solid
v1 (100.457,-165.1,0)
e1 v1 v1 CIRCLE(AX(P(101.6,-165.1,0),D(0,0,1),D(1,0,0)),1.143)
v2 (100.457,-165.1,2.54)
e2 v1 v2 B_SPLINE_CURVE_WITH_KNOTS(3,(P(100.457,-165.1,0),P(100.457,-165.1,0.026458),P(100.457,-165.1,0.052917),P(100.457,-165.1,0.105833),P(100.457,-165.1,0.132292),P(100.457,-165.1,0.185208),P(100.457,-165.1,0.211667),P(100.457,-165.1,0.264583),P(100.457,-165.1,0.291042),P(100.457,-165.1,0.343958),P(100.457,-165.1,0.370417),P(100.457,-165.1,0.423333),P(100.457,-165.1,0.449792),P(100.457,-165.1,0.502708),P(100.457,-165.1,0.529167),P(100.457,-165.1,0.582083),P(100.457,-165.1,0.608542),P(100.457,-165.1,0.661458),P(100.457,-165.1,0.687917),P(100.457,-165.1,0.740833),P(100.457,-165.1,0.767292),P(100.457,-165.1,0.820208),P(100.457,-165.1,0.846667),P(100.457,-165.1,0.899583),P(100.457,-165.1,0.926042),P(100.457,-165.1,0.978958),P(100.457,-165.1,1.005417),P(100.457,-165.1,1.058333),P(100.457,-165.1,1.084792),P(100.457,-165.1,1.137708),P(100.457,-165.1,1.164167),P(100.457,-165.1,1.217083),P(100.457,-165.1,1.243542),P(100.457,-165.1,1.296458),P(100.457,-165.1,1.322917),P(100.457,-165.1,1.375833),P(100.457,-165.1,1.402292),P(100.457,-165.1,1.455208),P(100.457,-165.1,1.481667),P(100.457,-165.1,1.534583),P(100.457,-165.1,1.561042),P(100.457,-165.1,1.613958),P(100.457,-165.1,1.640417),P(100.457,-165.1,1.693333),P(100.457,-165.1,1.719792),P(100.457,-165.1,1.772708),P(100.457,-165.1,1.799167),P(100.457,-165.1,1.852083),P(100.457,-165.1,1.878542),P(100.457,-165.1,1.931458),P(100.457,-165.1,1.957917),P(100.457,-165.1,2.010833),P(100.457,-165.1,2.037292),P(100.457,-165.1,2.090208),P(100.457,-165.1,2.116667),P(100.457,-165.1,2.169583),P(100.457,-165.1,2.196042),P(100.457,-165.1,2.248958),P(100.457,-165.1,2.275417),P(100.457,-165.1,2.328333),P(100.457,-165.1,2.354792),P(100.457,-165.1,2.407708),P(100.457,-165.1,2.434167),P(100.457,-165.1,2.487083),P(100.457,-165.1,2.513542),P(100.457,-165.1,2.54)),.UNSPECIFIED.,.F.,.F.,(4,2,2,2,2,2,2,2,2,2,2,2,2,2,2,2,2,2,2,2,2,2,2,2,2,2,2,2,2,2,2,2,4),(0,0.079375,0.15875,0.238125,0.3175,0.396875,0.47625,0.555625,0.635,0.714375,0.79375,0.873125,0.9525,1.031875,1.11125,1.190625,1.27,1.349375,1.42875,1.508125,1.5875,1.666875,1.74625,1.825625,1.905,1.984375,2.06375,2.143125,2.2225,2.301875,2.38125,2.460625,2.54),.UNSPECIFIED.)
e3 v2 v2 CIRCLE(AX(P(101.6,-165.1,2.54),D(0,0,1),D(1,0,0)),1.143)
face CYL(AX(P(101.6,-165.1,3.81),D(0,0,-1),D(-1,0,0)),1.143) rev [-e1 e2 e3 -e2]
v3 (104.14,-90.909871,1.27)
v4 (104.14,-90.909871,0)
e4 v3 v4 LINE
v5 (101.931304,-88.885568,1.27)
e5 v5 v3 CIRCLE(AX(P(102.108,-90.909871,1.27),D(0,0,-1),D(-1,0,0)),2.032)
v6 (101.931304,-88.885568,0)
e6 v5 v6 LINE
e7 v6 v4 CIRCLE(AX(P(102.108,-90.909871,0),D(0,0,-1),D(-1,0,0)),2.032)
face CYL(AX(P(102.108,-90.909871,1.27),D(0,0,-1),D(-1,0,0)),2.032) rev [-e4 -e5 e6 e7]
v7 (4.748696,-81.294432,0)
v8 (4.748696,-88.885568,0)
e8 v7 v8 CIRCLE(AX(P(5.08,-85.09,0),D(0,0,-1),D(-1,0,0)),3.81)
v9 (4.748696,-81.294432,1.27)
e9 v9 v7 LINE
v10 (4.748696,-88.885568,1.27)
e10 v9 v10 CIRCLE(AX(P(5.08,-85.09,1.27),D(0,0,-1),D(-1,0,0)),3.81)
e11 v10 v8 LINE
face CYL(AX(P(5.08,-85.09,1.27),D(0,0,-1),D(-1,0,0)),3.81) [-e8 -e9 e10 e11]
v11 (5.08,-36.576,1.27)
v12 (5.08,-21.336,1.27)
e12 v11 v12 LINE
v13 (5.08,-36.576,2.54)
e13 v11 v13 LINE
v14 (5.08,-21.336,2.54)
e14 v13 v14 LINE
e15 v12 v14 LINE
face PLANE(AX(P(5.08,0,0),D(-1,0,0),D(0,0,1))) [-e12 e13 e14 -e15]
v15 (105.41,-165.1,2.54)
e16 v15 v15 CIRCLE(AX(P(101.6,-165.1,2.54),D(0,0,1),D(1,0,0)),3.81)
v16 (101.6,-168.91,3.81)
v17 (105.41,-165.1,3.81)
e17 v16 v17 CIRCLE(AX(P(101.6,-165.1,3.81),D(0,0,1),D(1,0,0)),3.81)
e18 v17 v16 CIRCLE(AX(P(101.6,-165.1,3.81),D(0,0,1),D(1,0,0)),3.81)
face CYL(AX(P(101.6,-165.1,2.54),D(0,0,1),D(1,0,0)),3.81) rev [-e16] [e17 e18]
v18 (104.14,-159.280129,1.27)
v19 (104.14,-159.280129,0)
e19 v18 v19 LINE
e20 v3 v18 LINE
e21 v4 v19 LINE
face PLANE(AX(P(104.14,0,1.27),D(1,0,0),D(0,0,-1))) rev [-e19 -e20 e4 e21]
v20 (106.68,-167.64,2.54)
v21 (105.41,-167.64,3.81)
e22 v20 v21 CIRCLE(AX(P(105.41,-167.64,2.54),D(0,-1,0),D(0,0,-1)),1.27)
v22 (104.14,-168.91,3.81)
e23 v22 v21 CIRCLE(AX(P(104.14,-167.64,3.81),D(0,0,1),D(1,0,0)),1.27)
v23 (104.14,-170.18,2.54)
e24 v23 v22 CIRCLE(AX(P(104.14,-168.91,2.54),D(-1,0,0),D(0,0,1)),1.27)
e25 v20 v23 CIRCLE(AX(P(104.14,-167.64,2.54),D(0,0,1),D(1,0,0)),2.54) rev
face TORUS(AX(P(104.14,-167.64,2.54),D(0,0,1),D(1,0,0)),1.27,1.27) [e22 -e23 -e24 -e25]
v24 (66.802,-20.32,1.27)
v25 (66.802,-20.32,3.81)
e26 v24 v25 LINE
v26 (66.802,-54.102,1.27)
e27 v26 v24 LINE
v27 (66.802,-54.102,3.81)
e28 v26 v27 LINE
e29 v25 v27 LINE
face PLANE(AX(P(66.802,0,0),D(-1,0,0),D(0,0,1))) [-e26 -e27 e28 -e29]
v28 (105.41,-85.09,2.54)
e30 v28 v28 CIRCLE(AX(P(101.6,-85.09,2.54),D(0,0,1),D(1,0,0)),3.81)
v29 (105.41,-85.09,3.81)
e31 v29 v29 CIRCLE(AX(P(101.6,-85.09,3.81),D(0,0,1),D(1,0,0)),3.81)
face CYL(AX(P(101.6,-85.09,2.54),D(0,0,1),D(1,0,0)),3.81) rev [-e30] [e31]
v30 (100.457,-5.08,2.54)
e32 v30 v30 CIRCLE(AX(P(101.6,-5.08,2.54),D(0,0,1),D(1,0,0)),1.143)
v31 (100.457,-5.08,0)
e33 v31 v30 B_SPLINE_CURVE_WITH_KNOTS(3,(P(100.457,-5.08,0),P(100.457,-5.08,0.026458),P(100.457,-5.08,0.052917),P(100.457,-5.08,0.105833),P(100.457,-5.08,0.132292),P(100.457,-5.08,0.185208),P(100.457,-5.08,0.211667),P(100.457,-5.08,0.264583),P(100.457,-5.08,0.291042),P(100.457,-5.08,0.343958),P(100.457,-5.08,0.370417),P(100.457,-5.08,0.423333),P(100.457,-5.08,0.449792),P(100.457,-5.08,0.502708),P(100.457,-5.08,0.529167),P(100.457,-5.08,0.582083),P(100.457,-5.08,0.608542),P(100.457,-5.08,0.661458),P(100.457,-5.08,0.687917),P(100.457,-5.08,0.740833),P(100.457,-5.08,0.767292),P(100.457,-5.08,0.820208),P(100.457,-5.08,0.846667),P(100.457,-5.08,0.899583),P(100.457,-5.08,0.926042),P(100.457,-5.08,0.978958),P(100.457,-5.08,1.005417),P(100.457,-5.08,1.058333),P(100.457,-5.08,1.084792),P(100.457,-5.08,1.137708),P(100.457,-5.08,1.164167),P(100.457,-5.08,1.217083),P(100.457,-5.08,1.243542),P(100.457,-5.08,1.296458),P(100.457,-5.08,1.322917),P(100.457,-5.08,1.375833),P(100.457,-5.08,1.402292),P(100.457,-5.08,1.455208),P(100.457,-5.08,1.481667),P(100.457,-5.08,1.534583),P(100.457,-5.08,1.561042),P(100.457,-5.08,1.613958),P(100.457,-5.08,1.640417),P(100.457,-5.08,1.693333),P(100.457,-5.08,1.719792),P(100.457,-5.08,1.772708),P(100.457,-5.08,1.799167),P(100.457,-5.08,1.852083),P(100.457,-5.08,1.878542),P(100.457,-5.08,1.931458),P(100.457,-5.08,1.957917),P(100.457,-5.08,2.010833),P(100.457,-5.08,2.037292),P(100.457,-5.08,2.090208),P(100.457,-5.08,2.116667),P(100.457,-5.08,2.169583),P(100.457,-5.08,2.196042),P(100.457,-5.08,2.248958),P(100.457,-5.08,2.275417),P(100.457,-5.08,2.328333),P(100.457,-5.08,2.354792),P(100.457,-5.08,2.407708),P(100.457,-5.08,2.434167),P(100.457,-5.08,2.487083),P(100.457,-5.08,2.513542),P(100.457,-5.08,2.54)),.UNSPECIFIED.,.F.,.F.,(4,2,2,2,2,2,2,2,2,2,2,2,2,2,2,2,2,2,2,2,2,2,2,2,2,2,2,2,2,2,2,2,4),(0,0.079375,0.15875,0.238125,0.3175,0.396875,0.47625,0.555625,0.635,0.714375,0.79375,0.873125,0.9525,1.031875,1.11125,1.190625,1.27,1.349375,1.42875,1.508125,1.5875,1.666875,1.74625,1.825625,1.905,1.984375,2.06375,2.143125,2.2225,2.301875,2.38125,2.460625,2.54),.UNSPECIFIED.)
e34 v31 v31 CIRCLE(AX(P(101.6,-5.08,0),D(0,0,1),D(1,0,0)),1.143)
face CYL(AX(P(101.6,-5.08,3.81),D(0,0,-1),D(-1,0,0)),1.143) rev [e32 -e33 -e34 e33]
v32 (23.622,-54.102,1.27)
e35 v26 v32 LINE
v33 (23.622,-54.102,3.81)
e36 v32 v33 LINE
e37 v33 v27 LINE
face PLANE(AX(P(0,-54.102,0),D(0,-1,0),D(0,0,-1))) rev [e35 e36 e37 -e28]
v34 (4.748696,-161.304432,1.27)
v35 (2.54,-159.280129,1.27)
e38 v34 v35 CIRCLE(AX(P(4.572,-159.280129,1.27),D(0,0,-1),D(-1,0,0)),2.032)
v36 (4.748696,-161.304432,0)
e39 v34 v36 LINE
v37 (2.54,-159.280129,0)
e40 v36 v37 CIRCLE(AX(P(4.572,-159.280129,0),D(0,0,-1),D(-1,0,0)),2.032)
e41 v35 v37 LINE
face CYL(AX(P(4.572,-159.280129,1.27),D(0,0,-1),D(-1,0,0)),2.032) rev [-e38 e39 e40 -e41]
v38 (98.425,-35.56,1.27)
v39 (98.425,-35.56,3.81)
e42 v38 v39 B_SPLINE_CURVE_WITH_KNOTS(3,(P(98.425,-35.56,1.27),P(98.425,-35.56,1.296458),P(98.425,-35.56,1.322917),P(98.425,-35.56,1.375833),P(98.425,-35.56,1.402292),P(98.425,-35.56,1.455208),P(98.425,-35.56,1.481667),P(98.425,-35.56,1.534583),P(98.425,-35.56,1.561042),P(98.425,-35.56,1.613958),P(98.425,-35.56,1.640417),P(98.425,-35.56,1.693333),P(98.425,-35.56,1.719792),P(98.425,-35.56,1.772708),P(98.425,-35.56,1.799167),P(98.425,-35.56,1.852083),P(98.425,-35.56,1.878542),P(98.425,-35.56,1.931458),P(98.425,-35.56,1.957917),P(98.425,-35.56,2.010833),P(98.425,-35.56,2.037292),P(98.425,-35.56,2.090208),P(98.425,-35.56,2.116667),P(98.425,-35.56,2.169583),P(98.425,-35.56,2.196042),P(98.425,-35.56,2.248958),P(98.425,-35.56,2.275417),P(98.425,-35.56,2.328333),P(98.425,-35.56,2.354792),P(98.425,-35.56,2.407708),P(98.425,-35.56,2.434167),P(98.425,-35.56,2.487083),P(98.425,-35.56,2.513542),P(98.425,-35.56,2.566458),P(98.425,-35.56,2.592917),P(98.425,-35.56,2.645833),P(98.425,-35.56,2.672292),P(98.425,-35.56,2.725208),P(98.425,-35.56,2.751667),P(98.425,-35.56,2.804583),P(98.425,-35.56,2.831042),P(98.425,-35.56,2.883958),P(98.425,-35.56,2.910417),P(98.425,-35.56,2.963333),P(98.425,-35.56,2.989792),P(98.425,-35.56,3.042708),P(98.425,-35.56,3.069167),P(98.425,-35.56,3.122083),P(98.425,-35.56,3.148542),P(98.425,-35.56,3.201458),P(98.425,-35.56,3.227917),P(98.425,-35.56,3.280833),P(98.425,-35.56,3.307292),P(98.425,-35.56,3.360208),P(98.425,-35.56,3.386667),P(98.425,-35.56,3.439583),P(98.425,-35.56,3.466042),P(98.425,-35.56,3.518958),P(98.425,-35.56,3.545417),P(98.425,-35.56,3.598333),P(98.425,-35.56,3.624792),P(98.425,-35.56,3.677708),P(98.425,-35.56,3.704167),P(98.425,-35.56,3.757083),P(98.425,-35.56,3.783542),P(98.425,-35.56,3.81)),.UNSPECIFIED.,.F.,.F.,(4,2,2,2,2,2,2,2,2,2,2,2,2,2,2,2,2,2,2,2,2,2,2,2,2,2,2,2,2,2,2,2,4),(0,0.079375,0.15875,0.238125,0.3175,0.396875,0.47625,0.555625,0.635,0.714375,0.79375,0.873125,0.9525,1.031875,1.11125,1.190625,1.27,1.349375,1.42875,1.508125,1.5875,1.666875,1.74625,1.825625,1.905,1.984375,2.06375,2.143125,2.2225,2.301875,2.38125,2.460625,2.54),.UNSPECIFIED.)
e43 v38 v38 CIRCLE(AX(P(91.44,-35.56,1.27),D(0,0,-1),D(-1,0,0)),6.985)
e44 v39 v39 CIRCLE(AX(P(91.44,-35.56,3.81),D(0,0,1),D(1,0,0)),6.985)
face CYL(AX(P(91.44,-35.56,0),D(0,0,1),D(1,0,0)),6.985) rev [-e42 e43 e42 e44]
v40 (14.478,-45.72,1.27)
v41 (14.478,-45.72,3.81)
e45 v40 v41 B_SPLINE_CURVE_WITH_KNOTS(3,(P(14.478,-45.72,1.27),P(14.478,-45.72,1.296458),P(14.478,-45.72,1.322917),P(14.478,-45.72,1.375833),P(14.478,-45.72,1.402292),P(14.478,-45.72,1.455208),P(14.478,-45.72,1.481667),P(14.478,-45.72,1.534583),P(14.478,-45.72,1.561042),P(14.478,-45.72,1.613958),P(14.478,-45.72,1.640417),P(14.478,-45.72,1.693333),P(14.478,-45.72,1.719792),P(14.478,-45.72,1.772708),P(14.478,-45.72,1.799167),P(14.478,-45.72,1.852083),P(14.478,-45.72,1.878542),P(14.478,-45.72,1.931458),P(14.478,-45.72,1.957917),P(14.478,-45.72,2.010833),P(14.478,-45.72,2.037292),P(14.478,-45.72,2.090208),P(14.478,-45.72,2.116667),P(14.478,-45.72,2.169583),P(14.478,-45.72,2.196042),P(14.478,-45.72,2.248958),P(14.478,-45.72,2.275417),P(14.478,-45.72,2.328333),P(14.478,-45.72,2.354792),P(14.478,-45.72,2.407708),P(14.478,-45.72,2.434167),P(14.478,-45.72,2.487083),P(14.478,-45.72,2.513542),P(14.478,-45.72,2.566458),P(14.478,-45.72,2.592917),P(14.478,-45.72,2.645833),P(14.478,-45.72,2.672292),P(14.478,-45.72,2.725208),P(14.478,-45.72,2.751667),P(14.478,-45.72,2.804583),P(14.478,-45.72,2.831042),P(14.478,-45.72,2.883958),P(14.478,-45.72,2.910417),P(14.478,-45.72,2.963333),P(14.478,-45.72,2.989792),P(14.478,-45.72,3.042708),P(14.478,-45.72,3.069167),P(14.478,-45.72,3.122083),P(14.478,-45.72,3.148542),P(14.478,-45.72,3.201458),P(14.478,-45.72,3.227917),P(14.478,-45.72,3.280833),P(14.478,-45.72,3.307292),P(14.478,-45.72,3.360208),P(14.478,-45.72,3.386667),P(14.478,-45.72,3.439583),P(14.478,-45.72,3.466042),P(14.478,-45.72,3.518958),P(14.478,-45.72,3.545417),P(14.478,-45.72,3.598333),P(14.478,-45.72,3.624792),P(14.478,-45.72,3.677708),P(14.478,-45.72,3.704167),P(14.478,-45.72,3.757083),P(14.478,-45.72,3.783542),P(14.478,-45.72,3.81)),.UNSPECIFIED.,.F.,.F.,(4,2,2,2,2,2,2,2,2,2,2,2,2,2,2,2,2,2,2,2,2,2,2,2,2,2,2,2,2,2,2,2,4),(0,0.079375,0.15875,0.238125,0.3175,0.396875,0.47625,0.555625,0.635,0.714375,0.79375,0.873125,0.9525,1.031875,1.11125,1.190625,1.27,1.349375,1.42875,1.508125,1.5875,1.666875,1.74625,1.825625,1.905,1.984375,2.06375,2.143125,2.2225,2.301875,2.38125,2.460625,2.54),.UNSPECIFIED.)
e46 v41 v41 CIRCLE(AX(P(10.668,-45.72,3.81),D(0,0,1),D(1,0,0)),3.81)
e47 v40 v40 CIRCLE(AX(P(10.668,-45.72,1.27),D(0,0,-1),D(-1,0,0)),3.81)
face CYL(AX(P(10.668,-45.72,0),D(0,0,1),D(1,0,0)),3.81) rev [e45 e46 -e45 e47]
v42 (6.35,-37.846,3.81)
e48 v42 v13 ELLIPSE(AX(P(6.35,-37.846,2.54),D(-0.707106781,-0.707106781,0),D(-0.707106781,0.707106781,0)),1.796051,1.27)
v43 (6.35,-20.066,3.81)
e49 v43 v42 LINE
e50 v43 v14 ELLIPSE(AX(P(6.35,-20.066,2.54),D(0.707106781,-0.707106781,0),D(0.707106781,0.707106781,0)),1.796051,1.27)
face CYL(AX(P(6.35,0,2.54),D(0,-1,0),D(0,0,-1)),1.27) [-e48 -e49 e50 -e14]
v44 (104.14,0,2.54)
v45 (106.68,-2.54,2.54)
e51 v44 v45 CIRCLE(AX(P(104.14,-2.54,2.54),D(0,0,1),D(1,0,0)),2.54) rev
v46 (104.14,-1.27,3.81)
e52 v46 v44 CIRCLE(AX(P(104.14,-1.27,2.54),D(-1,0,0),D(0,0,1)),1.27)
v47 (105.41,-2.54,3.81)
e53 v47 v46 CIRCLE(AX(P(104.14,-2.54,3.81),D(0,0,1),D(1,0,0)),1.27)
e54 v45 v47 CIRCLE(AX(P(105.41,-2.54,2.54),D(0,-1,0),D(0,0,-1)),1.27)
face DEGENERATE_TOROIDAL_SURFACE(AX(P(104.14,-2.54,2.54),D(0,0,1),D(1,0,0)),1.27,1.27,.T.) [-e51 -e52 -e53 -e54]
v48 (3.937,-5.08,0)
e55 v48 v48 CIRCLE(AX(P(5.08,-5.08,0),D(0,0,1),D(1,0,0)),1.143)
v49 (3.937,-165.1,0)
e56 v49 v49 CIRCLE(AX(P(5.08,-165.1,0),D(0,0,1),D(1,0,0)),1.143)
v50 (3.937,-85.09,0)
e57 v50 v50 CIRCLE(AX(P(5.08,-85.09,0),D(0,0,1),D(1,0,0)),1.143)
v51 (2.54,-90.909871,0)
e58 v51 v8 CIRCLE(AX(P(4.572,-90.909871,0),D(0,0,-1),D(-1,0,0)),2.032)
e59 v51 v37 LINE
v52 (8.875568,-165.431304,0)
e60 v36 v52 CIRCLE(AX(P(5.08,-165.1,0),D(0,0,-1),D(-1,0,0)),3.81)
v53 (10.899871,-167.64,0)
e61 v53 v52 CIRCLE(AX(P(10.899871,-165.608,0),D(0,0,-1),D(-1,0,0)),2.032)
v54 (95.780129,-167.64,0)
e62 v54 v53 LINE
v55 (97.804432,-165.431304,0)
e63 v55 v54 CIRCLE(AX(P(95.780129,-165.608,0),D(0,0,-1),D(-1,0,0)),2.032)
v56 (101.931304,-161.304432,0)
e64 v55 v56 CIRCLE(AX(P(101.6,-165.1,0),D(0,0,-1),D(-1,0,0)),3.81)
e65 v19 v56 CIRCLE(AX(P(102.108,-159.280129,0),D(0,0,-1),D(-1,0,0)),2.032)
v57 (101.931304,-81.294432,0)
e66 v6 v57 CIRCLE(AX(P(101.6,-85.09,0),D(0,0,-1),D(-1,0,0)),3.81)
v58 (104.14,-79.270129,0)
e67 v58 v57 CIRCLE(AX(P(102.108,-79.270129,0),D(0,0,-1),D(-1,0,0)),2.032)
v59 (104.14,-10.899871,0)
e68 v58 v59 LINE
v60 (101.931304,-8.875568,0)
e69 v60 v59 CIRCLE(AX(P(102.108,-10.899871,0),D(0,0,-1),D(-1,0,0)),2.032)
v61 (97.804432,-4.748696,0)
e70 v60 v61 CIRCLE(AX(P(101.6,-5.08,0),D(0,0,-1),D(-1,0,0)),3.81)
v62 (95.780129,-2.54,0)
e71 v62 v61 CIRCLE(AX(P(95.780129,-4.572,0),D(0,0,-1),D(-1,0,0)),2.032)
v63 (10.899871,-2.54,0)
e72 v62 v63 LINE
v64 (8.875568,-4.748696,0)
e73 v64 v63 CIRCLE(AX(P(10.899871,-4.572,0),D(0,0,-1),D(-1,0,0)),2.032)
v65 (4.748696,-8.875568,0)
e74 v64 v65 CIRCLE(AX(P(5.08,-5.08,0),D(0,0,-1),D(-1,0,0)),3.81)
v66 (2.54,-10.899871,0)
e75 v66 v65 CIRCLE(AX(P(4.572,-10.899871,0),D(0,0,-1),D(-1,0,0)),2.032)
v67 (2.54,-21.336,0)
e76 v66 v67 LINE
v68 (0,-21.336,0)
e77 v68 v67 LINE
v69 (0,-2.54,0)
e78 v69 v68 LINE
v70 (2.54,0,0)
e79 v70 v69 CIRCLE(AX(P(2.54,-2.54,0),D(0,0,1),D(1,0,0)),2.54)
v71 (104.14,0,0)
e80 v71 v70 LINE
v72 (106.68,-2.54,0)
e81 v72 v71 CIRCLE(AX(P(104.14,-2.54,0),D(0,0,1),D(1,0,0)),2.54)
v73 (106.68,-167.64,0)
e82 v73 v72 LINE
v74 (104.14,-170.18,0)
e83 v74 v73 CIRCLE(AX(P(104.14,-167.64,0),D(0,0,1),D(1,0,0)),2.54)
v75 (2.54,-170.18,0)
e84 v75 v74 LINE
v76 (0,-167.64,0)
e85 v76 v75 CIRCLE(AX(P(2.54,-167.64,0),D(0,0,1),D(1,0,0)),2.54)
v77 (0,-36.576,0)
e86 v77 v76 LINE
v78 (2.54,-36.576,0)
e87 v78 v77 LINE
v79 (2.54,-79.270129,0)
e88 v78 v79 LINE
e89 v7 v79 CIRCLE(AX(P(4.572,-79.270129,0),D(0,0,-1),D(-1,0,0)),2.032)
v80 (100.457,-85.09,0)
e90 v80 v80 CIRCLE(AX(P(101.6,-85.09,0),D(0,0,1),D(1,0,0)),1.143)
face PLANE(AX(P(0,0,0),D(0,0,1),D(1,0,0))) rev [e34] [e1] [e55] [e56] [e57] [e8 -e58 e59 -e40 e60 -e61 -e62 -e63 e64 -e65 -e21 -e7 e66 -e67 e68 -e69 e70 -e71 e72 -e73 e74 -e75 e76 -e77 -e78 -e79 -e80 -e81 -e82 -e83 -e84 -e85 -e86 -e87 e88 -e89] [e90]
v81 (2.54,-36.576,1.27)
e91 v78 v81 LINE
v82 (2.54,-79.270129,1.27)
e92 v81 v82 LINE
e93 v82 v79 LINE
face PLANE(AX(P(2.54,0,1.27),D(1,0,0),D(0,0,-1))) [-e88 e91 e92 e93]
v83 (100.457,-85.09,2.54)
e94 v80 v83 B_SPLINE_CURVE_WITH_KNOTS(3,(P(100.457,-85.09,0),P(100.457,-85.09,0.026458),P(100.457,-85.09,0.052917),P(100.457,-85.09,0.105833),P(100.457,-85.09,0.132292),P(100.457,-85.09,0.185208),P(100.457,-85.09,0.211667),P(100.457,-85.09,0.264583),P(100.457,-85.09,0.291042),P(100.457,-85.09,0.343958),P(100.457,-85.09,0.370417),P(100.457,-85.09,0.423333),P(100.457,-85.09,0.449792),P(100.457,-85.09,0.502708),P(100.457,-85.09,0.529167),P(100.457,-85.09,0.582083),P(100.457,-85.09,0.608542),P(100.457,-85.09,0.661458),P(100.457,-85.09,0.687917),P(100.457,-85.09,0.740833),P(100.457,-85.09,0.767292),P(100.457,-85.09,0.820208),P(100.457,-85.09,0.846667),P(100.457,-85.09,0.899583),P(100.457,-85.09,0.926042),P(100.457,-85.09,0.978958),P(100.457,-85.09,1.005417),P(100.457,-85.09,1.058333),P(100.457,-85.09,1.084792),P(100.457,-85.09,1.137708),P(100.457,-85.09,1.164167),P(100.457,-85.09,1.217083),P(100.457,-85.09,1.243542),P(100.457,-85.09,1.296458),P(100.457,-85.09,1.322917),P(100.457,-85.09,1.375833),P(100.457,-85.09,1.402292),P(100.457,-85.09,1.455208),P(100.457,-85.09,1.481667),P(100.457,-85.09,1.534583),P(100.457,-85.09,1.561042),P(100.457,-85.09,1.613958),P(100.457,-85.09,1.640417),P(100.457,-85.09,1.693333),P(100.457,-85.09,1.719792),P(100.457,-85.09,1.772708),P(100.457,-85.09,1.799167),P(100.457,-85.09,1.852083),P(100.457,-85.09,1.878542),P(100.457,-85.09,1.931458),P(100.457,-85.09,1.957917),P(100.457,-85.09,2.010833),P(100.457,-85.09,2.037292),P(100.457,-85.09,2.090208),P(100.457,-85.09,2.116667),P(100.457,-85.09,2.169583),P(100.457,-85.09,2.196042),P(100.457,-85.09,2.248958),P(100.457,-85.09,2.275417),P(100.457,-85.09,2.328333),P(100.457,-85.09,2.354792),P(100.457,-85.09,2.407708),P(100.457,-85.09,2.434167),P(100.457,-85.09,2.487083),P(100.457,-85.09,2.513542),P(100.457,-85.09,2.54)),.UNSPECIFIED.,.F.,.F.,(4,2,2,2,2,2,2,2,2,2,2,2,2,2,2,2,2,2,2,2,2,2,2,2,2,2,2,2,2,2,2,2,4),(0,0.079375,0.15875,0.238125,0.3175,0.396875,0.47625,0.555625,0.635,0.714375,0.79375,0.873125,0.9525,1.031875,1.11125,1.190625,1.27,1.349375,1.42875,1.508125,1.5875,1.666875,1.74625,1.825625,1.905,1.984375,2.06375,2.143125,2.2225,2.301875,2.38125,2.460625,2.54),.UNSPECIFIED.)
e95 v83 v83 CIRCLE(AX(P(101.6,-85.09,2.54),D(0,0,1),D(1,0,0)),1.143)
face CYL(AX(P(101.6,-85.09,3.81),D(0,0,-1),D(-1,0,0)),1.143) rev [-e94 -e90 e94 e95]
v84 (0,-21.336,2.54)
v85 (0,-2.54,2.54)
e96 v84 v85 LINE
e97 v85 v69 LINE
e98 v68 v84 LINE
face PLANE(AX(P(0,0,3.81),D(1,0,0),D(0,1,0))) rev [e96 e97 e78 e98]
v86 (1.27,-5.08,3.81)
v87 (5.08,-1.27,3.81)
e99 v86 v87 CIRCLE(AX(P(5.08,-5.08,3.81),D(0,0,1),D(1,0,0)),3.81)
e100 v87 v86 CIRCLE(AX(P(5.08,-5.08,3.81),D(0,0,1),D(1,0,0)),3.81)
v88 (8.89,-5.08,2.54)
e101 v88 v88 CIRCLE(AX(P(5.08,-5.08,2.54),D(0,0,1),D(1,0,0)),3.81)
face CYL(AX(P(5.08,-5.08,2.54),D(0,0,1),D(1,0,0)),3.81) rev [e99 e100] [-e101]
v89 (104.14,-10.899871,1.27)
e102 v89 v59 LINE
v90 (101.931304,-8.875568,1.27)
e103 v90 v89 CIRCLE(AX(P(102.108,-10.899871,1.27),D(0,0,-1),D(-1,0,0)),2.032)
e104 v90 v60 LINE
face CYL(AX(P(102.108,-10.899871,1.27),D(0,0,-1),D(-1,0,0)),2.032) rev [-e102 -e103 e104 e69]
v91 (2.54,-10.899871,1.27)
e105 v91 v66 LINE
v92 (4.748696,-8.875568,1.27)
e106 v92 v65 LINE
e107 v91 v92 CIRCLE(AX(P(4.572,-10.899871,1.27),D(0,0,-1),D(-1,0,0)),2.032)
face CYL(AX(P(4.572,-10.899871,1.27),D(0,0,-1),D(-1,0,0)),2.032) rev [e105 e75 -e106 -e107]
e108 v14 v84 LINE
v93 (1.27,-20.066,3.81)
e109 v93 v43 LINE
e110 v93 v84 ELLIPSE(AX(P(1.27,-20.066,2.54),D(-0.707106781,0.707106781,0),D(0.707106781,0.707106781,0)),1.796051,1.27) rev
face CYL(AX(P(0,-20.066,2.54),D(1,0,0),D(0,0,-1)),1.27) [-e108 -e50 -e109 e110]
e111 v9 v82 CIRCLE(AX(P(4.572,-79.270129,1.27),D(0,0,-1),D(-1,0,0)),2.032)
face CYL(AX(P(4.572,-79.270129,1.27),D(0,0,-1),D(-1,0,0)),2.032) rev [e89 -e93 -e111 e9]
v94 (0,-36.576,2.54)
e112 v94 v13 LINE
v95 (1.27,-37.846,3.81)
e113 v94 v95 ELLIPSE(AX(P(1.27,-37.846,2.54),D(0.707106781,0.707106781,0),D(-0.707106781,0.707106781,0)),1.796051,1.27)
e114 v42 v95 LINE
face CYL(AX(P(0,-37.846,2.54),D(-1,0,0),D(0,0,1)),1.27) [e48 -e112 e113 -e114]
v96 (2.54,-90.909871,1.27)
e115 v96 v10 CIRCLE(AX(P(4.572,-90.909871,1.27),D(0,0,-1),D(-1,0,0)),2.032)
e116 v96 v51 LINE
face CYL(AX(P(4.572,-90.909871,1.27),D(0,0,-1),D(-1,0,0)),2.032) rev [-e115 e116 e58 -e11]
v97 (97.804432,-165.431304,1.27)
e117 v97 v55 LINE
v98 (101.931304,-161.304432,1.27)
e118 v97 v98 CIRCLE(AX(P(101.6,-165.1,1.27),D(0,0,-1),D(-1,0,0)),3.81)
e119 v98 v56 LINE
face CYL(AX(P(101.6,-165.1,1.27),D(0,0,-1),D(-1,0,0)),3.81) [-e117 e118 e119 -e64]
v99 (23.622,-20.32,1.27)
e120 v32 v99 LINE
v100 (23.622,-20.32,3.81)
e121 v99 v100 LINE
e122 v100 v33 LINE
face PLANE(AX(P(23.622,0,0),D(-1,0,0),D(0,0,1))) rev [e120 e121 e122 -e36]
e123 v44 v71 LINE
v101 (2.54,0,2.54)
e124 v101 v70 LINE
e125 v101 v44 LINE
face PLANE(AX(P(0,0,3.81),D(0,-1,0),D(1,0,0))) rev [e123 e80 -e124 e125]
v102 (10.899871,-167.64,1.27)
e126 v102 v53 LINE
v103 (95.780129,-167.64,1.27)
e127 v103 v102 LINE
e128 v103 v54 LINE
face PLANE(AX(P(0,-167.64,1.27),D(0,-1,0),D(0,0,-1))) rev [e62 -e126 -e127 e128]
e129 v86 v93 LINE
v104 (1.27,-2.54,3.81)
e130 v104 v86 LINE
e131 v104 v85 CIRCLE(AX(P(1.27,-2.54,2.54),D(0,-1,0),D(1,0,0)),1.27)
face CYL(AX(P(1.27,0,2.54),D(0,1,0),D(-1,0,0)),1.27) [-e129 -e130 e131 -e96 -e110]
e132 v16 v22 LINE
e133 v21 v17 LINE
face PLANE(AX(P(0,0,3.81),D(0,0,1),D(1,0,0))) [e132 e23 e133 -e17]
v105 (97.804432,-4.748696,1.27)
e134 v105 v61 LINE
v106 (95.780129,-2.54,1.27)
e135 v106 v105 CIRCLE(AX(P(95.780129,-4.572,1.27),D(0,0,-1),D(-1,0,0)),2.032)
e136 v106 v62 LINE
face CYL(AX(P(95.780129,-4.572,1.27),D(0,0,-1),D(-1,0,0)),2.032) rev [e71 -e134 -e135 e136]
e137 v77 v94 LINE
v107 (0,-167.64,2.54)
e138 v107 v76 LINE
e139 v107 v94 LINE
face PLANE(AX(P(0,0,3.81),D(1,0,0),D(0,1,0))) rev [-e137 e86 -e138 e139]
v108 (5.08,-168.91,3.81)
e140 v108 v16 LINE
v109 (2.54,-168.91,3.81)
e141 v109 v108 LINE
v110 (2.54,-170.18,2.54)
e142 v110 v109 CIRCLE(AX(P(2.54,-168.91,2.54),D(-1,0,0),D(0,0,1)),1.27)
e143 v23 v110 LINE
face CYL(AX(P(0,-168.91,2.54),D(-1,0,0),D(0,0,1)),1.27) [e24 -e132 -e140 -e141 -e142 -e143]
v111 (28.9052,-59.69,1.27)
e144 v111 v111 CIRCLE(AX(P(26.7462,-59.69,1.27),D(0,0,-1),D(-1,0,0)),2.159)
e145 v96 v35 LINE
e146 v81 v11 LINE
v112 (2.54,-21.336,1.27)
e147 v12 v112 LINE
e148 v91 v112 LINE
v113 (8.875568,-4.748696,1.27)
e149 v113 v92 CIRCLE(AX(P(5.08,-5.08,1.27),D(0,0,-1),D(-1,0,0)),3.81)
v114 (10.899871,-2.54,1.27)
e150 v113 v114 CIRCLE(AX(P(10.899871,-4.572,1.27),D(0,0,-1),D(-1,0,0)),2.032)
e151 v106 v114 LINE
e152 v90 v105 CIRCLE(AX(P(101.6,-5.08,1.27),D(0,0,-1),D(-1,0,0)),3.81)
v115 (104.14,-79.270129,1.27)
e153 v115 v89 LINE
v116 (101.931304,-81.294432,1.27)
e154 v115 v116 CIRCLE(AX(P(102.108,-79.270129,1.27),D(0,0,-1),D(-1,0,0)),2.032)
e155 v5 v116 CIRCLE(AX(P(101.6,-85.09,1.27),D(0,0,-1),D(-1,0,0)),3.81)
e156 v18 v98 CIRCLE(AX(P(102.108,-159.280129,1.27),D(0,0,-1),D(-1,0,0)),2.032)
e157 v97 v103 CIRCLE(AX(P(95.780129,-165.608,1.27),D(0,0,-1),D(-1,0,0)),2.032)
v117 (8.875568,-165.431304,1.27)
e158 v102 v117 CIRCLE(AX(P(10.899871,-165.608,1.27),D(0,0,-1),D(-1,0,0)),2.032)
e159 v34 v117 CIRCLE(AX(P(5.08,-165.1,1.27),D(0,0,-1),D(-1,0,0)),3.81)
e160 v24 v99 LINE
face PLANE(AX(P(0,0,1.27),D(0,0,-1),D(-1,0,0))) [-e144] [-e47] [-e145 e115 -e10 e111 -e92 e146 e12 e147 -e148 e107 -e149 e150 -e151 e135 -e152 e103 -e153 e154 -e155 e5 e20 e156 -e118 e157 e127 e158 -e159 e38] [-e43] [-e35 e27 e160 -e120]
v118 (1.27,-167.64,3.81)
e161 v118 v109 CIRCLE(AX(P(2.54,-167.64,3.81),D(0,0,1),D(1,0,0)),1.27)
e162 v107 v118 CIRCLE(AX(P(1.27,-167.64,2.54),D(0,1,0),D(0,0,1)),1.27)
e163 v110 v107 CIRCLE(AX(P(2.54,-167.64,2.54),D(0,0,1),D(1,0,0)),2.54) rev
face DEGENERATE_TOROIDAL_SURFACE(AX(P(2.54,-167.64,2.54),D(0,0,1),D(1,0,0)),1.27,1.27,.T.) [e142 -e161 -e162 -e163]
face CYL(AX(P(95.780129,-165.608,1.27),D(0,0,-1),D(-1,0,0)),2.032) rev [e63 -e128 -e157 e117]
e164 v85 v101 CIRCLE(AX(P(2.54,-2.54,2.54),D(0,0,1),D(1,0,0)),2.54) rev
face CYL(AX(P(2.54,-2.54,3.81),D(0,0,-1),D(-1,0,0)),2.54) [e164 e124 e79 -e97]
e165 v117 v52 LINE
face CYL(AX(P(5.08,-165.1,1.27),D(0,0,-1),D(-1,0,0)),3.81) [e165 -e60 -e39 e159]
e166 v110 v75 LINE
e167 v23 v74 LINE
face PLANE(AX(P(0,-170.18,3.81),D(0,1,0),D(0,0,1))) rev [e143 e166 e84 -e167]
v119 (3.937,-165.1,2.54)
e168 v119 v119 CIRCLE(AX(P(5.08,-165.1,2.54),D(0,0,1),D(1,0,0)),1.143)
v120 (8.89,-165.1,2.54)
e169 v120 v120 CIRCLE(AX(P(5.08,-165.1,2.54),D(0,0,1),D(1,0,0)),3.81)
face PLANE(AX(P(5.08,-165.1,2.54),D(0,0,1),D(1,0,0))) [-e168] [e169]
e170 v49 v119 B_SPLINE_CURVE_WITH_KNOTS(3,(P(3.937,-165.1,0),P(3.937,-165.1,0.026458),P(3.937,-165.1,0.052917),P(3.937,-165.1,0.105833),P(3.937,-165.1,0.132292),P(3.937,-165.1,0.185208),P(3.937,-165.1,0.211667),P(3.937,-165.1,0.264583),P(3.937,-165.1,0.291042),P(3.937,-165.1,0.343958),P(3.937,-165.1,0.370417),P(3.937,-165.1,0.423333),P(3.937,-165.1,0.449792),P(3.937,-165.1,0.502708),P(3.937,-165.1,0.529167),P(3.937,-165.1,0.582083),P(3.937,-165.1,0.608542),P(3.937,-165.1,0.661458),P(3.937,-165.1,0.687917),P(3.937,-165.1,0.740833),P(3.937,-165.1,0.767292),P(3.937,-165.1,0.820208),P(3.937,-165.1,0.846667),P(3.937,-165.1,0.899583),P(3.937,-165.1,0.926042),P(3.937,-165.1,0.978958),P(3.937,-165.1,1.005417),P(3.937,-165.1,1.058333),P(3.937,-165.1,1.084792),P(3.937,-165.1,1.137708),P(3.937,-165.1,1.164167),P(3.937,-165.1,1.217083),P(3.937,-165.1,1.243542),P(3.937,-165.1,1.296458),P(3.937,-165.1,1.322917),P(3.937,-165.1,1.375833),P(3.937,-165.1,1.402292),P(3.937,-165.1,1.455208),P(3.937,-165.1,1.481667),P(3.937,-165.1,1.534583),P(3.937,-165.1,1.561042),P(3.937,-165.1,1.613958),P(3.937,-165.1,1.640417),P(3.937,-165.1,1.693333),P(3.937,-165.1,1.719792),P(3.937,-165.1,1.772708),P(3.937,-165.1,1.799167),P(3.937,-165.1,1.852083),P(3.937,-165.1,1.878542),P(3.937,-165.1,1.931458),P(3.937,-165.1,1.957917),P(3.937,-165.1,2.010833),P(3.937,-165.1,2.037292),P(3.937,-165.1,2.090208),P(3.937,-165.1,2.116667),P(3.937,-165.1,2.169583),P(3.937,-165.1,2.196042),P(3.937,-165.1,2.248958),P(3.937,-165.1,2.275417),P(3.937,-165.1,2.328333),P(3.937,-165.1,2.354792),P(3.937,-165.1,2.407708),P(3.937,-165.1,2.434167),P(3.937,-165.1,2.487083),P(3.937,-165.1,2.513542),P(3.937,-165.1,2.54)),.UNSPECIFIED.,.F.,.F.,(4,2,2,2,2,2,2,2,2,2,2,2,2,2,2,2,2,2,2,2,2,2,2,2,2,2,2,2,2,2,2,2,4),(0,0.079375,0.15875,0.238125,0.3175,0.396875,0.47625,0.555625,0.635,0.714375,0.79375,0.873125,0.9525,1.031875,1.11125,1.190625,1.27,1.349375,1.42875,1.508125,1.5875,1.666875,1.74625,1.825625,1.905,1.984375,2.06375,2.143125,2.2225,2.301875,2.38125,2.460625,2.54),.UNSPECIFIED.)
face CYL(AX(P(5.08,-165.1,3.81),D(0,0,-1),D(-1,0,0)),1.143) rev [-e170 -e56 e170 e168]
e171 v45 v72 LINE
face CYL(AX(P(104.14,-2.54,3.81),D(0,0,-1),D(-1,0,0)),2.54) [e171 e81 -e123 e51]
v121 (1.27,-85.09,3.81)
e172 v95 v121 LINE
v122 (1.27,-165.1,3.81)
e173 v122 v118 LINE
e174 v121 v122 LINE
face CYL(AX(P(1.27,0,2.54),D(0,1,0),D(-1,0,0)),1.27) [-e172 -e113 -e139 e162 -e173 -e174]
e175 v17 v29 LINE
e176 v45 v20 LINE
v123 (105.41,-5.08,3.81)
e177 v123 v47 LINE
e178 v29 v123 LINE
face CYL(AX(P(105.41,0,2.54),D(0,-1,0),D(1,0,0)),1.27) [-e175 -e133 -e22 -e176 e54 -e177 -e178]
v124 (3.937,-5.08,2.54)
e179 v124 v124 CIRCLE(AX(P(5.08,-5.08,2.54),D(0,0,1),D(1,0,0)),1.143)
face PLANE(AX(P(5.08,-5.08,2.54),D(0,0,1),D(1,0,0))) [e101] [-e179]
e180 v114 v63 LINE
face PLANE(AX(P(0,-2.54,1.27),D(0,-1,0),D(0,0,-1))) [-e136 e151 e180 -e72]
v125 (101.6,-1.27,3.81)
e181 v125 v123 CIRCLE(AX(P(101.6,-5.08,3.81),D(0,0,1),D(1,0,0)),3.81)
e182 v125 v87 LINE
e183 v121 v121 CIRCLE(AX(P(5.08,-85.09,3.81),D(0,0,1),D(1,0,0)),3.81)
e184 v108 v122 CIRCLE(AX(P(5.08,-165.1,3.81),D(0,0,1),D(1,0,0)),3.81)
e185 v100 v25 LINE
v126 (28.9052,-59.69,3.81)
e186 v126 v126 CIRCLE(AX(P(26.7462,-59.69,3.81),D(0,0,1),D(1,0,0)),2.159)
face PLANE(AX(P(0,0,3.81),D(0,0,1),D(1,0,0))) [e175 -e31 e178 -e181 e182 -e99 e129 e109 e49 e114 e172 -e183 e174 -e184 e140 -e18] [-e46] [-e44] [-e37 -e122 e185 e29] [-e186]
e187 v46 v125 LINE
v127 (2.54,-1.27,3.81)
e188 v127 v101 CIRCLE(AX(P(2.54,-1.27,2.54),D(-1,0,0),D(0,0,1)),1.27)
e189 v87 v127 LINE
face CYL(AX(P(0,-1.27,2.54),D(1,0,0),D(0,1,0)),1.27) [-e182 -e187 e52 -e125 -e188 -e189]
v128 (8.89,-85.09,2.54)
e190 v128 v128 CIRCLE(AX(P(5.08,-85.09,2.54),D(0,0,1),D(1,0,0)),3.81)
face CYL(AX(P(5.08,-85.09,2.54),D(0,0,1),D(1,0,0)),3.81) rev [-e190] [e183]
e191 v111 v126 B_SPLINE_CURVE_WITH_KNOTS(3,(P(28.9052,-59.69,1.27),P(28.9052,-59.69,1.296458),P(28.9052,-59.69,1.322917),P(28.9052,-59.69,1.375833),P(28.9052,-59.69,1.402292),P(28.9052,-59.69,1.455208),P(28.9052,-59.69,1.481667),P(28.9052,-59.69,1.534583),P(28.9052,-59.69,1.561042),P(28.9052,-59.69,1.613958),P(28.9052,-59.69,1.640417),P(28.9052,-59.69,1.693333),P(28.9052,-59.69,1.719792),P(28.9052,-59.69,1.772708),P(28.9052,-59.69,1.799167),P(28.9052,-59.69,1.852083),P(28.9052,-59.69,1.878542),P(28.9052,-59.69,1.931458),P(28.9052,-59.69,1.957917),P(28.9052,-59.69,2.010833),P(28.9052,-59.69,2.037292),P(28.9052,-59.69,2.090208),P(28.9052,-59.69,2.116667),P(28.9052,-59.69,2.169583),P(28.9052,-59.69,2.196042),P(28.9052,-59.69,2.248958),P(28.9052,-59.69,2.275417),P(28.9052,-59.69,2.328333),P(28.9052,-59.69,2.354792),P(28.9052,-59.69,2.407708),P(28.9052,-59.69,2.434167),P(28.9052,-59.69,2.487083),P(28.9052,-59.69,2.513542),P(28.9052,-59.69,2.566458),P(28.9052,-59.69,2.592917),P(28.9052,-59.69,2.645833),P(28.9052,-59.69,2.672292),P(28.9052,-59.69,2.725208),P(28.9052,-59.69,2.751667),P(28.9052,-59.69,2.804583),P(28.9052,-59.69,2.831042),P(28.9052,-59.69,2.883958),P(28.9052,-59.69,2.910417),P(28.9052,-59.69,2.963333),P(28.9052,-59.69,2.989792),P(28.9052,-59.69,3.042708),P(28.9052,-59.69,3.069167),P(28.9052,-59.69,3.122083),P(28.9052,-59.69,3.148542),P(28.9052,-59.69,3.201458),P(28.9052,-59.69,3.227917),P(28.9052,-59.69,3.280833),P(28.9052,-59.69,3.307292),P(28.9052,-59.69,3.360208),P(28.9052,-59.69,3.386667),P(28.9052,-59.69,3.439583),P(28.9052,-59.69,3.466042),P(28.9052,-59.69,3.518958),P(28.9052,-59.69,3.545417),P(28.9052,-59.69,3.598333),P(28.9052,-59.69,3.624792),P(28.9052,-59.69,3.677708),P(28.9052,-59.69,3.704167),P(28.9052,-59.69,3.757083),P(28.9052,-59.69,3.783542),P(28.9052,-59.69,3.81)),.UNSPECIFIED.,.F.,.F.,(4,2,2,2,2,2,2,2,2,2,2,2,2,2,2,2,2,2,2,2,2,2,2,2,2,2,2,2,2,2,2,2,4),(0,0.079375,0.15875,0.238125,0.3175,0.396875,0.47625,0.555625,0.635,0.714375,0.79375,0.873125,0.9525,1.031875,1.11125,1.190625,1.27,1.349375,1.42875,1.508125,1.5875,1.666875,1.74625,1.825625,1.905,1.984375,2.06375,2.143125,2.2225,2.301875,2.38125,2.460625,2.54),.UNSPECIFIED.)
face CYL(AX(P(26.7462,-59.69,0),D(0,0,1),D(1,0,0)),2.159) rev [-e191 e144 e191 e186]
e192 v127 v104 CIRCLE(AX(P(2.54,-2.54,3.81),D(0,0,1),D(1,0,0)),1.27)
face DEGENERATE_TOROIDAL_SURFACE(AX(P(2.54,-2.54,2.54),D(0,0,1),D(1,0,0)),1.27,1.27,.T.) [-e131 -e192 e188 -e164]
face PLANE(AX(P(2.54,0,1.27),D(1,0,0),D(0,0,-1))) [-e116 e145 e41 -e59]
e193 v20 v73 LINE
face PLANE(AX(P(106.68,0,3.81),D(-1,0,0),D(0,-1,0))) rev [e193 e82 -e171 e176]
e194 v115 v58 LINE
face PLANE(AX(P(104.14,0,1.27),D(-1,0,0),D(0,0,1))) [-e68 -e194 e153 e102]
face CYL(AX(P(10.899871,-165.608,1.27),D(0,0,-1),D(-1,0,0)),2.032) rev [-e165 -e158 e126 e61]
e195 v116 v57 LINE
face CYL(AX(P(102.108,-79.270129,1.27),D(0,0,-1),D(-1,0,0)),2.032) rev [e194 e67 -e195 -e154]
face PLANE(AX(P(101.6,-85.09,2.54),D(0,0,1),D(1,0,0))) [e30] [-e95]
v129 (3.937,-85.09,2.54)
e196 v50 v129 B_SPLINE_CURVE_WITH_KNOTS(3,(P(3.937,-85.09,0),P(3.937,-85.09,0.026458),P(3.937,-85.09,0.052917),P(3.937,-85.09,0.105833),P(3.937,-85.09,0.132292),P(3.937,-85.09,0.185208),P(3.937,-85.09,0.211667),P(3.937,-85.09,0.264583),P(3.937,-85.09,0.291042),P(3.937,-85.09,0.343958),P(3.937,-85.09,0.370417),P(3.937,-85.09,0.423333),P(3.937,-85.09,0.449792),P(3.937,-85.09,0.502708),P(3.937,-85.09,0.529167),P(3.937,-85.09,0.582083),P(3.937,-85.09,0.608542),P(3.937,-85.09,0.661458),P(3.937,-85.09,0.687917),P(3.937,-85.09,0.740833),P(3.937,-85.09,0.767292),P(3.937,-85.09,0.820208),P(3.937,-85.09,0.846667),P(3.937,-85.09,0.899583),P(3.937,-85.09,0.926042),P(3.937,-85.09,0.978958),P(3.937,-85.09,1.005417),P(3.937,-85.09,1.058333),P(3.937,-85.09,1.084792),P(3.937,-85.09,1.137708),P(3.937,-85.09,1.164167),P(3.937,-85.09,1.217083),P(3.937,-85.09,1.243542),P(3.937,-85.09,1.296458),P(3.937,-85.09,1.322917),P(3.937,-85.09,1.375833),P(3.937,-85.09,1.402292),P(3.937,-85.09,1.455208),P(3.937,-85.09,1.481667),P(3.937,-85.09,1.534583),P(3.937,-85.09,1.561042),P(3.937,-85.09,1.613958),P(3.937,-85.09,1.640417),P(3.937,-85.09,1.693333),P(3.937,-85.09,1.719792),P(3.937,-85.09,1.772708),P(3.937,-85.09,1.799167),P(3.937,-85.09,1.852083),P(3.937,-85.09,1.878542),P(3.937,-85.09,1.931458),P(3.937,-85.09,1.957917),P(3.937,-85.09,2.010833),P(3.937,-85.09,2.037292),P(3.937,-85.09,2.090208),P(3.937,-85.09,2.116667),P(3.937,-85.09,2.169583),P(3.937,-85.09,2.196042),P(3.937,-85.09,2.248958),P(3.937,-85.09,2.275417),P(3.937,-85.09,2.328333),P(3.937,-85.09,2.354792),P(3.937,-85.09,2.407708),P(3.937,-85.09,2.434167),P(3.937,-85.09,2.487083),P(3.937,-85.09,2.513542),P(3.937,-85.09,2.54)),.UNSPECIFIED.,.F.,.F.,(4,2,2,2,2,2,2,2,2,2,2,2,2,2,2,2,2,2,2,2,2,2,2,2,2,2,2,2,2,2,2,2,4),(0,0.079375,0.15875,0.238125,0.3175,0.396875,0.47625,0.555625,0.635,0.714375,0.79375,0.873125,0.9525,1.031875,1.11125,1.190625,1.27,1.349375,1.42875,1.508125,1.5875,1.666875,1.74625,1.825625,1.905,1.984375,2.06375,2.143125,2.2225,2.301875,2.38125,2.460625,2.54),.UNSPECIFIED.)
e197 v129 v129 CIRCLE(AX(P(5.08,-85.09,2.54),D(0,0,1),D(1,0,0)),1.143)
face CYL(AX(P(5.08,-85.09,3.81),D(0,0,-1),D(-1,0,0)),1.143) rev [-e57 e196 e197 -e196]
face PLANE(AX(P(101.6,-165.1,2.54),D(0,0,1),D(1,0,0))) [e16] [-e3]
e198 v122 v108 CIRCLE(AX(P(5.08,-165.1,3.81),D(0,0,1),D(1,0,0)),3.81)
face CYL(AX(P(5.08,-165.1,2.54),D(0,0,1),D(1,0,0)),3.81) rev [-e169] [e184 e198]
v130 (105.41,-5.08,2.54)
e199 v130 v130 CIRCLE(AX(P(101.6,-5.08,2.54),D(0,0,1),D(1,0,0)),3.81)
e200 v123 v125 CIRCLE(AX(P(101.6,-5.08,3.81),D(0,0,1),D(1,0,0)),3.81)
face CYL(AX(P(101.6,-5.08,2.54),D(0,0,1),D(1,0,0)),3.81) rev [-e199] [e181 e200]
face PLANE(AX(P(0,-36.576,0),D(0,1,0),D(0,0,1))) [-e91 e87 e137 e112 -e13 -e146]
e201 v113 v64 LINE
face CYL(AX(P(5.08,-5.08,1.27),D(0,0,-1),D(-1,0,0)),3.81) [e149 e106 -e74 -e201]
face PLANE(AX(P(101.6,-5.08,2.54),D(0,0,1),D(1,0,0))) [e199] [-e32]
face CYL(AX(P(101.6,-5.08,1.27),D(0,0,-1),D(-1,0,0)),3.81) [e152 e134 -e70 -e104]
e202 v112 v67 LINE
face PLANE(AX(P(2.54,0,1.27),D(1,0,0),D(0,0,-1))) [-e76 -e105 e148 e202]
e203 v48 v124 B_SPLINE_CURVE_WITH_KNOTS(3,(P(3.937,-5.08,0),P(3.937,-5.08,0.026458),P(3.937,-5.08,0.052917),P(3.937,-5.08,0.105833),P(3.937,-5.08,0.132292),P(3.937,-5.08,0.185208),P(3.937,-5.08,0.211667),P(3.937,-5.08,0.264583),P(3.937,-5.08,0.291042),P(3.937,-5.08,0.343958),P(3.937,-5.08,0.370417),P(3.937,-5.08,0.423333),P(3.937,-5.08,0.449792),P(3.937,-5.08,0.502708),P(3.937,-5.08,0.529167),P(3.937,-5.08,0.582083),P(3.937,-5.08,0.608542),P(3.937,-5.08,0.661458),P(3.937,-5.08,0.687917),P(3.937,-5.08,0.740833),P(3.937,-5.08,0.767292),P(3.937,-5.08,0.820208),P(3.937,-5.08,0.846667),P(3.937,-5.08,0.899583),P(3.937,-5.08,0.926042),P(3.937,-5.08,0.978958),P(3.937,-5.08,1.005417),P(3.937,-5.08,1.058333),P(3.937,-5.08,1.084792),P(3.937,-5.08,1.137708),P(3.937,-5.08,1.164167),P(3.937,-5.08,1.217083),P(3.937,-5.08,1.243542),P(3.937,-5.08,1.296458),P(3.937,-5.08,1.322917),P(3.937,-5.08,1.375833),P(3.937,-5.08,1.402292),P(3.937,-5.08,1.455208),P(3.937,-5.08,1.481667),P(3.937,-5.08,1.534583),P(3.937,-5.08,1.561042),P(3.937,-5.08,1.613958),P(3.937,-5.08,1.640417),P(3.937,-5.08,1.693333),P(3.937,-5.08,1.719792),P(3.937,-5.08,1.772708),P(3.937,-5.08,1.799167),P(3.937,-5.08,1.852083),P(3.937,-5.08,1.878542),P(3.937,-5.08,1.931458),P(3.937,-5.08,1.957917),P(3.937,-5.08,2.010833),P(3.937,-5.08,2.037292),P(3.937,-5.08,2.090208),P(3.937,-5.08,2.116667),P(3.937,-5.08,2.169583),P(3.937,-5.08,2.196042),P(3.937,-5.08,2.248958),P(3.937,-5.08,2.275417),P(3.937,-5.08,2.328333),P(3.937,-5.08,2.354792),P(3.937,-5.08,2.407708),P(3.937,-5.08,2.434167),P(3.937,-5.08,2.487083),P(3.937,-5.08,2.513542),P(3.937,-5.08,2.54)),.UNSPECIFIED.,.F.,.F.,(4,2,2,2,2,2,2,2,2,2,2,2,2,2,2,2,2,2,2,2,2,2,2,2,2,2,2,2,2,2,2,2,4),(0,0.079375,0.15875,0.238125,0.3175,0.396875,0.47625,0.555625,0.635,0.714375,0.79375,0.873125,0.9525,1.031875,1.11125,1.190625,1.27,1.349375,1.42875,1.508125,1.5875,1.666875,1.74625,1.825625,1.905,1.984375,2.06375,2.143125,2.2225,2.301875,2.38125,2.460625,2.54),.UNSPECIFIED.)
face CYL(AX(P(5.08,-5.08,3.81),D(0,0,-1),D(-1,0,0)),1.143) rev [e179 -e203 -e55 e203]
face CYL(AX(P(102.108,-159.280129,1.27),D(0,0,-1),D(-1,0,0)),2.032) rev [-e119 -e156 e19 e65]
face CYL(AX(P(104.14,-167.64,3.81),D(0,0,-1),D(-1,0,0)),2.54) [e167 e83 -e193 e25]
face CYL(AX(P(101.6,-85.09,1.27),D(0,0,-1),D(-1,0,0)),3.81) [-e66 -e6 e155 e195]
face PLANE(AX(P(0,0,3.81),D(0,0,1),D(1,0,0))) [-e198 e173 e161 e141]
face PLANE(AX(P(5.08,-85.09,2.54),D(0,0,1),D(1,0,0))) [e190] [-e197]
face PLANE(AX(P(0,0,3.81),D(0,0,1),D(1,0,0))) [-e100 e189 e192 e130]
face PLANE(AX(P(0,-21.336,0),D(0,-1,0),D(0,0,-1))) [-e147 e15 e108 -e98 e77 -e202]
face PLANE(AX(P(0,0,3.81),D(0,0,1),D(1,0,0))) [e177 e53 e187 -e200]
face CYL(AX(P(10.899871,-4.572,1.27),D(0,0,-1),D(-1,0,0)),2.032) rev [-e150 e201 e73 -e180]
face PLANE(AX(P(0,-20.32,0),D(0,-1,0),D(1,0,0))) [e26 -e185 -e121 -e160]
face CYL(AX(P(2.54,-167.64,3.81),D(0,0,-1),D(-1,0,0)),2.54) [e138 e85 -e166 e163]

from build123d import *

# Parameters (mm, degrees)
SKETCH3_R           = 1.143
BOSS_EXTRUDE3_DEPTH = 3.81
CUT_EXTRUDE9_DEPTH  = 1.27
CUT_EXTRUDE10_DEPTH = 201.888951662
SKETCH11_W          = 43.18
SKETCH11_H          = 33.782
SKETCH11_R          = 3.81
SKETCH11_R_2        = 2.159
SKETCH11_R_3        = 6.985
CUT_EXTRUDE11_DEPTH = 201.888951662
CUT_EXTRUDE12_START = -1.27
SKETCH12_R          = 3.81
CUT_EXTRUDE12_DEPTH = 1.27
FILLET1_R           = 1.27


with BuildPart() as part:
    # Sketch3 → Boss-Extrude3 (new body)
    # profile 1 of 2: a face of its own
    with BuildSketch(Plane.XY):
        with BuildLine():
            Line((104.14, 0), (2.54, 0))
            ThreePointArc((2.54, 0), (0.743948776, -0.743948776), (0, -2.54))
            Line((0, -2.54), (0, -167.64))
            ThreePointArc((0, -167.64), (0.743948776, -169.436051224), (2.54, -170.18))
            Line((2.54, -170.18), (104.14, -170.18))
            ThreePointArc((104.14, -170.18), (105.936051224, -169.436051224), (106.68, -167.64))
            Line((106.68, -167.64), (106.68, -2.54))
            ThreePointArc((106.68, -2.54), (105.936051224, -0.743948776), (104.14, 0))
        make_face()
        with Locations(Location((101.6, -85.09, 0), (0, 0, 180))):
            Circle(SKETCH3_R, mode=Mode.SUBTRACT)
        with Locations(Location((5.08, -85.09, 0), (0, 0, 180))):
            Circle(SKETCH3_R, mode=Mode.SUBTRACT)
        with Locations(Location((5.08, -165.1, 0), (0, 0, 180))):
            Circle(SKETCH3_R, mode=Mode.SUBTRACT)
        with Locations(Location((101.6, -165.1, 0), (0, 0, 180))):
            Circle(SKETCH3_R, mode=Mode.SUBTRACT)
        with Locations(Location((5.08, -5.08, 0), (0, 0, 180))):
            Circle(SKETCH3_R, mode=Mode.SUBTRACT)
        with Locations(Location((101.6, -5.08, 0), (0, 0, 180))):
            Circle(SKETCH3_R, mode=Mode.SUBTRACT)
        with BuildLine():
            ThreePointArc((10.899871133, -2.54), (9.401860858, -3.199050905), (8.87556813, -4.748695652))
            ThreePointArc((8.87556813, -4.748695652), (7.774076836, -7.774076836), (4.748695652, -8.87556813))
            ThreePointArc((4.748695652, -8.87556813), (3.199050905, -9.401860858), (2.54, -10.899871133))
            Line((2.54, -10.899871133), (2.54, -79.270128867))
            ThreePointArc((2.54, -79.270128867), (3.199050905, -80.768139142), (4.748695652, -81.29443187))
            ThreePointArc((4.748695652, -81.29443187), (8.89, -85.09), (4.748695652, -88.88556813))
            ThreePointArc((4.748695652, -88.88556813), (3.199050905, -89.411860858), (2.54, -90.909871133))
            Line((2.54, -90.909871133), (2.54, -159.280128867))
            ThreePointArc((2.54, -159.280128867), (3.199050905, -160.778139142), (4.748695652, -161.30443187))
            ThreePointArc((4.748695652, -161.30443187), (7.774076836, -162.405923164), (8.87556813, -165.431304348))
            ThreePointArc((8.87556813, -165.431304348), (9.401860858, -166.980949095), (10.899871133, -167.64))
            Line((10.899871133, -167.64), (95.780128867, -167.64))
            ThreePointArc((95.780128867, -167.64), (97.278139142, -166.980949095), (97.80443187, -165.431304348))
            ThreePointArc((97.80443187, -165.431304348), (98.905923164, -162.405923164), (101.931304348, -161.30443187))
            ThreePointArc((101.931304348, -161.30443187), (103.480949095, -160.778139142), (104.14, -159.280128867))
            Line((104.14, -159.280128867), (104.14, -90.909871133))
            ThreePointArc((104.14, -90.909871133), (103.480949095, -89.411860858), (101.931304348, -88.88556813))
            ThreePointArc((101.931304348, -88.88556813), (97.79, -85.09), (101.931304348, -81.29443187))
            ThreePointArc((101.931304348, -81.29443187), (103.480949095, -80.768139142), (104.14, -79.270128867))
            Line((104.14, -79.270128867), (104.14, -10.899871133))
            ThreePointArc((104.14, -10.899871133), (103.480949095, -9.401860858), (101.931304348, -8.87556813))
            ThreePointArc((101.931304348, -8.87556813), (98.905923164, -7.774076836), (97.80443187, -4.748695652))
            ThreePointArc((97.80443187, -4.748695652), (97.278139142, -3.199050905), (95.780128867, -2.54))
            Line((95.780128867, -2.54), (10.899871133, -2.54))
        make_face(mode=Mode.SUBTRACT)
    # profile 2 of 2: a face of its own
    with BuildSketch(Plane.XY):
        with BuildLine():
            Line((10.899871133, -2.54), (95.780128867, -2.54))
            ThreePointArc((95.780128867, -2.54), (97.278139142, -3.199050905), (97.80443187, -4.748695652))
            ThreePointArc((97.80443187, -4.748695652), (98.905923164, -7.774076836), (101.931304348, -8.87556813))
            ThreePointArc((101.931304348, -8.87556813), (103.480949095, -9.401860858), (104.14, -10.899871133))
            Line((104.14, -10.899871133), (104.14, -79.270128867))
            ThreePointArc((104.14, -79.270128867), (103.480949095, -80.768139142), (101.931304348, -81.29443187))
            ThreePointArc((101.931304348, -81.29443187), (97.79, -85.09), (101.931304348, -88.88556813))
            ThreePointArc((101.931304348, -88.88556813), (103.480949095, -89.411860858), (104.14, -90.909871133))
            Line((104.14, -90.909871133), (104.14, -159.280128867))
            ThreePointArc((104.14, -159.280128867), (103.480949095, -160.778139142), (101.931304348, -161.30443187))
            ThreePointArc((101.931304348, -161.30443187), (98.905923164, -162.405923164), (97.80443187, -165.431304348))
            ThreePointArc((97.80443187, -165.431304348), (97.278139142, -166.980949095), (95.780128867, -167.64))
            Line((95.780128867, -167.64), (10.899871133, -167.64))
            ThreePointArc((10.899871133, -167.64), (9.401860858, -166.980949095), (8.87556813, -165.431304348))
            ThreePointArc((8.87556813, -165.431304348), (7.774076836, -162.405923164), (4.748695652, -161.30443187))
            ThreePointArc((4.748695652, -161.30443187), (3.199050905, -160.778139142), (2.54, -159.280128867))
            Line((2.54, -159.280128867), (2.54, -90.909871133))
            ThreePointArc((2.54, -90.909871133), (3.199050905, -89.411860858), (4.748695652, -88.88556813))
            ThreePointArc((4.748695652, -88.88556813), (8.89, -85.09), (4.748695652, -81.29443187))
            ThreePointArc((4.748695652, -81.29443187), (3.199050905, -80.768139142), (2.54, -79.270128867))
            Line((2.54, -79.270128867), (2.54, -10.899871133))
            ThreePointArc((2.54, -10.899871133), (3.199050905, -9.401860858), (4.748695652, -8.87556813))
            ThreePointArc((4.748695652, -8.87556813), (7.774076836, -7.774076836), (8.87556813, -4.748695652))
            ThreePointArc((8.87556813, -4.748695652), (9.401860858, -3.199050905), (10.899871133, -2.54))
        make_face()
    extrude(amount=BOSS_EXTRUDE3_DEPTH)

    # Sketch7 → Cut-Extrude9 (cut)
    with BuildSketch(Plane(origin=(0, 0, 0), x_dir=(-1, 0, 0), z_dir=(0, 0, -1))):
        with BuildLine():
            Line((-95.780128867, -2.54), (-10.899871133, -2.54))
            ThreePointArc((-10.899871133, -2.54), (-9.401860858, -3.199050905), (-8.87556813, -4.748695652))
            ThreePointArc((-8.87556813, -4.748695652), (-7.774076836, -7.774076836), (-4.748695652, -8.87556813))
            ThreePointArc((-4.748695652, -8.87556813), (-3.199050905, -9.401860858), (-2.54, -10.899871133))
            Line((-2.54, -10.899871133), (-2.54, -79.270128867))
            ThreePointArc((-2.54, -79.270128867), (-3.199050905, -80.768139142), (-4.748695652, -81.29443187))
            ThreePointArc((-4.748695652, -81.29443187), (-8.89, -85.09), (-4.748695652, -88.88556813))
            ThreePointArc((-4.748695652, -88.88556813), (-3.199050905, -89.411860858), (-2.54, -90.909871133))
            Line((-2.54, -90.909871133), (-2.54, -159.280128867))
            ThreePointArc((-2.54, -159.280128867), (-3.199050905, -160.778139142), (-4.748695652, -161.30443187))
            ThreePointArc((-4.748695652, -161.30443187), (-7.774076836, -162.405923164), (-8.87556813, -165.431304348))
            ThreePointArc((-8.87556813, -165.431304348), (-9.401860858, -166.980949095), (-10.899871133, -167.64))
            Line((-10.899871133, -167.64), (-95.780128867, -167.64))
            ThreePointArc((-95.780128867, -167.64), (-97.278139142, -166.980949095), (-97.80443187, -165.431304348))
            ThreePointArc((-97.80443187, -165.431304348), (-98.905923164, -162.405923164), (-101.931304348, -161.30443187))
            ThreePointArc((-101.931304348, -161.30443187), (-103.480949095, -160.778139142), (-104.14, -159.280128867))
            Line((-104.14, -159.280128867), (-104.14, -90.909871133))
            ThreePointArc((-104.14, -90.909871133), (-103.480949095, -89.411860858), (-101.931304348, -88.88556813))
            ThreePointArc((-101.931304348, -88.88556813), (-97.79, -85.09), (-101.931304348, -81.29443187))
            ThreePointArc((-101.931304348, -81.29443187), (-103.480949095, -80.768139142), (-104.14, -79.270128867))
            Line((-104.14, -79.270128867), (-104.14, -36.557585396))
            Line((-104.14, -36.557585396), (-104.14, -10.899871133))
            ThreePointArc((-104.14, -10.899871133), (-103.480949095, -9.401860858), (-101.931304348, -8.87556813))
            ThreePointArc((-101.931304348, -8.87556813), (-98.905923164, -7.774076836), (-97.80443187, -4.748695652))
            ThreePointArc((-97.80443187, -4.748695652), (-97.278139142, -3.199050905), (-95.780128867, -2.54))
        make_face()
    extrude(amount=-CUT_EXTRUDE9_DEPTH, mode=Mode.SUBTRACT)

    # Sketch10 → Cut-Extrude10 (cut, through all)
    with BuildSketch(Plane.XY.offset(3.81)):
        Polygon((2.54, -21.336), (0, -21.336), (0, -36.576), (2.54, -36.576), (5.08, -36.576), (5.08, -21.336), align=None)
    extrude(amount=-CUT_EXTRUDE10_DEPTH, mode=Mode.SUBTRACT)

    # Sketch11 → Cut-Extrude11 (cut, through all)
    with BuildSketch(Plane.XY.offset(3.81)):
        with Locations((45.212, -37.211)):
            Rectangle(SKETCH11_W, SKETCH11_H)
        with Locations((10.668, -45.72)):
            Circle(SKETCH11_R)
        with Locations((26.7462, -59.69)):
            Circle(SKETCH11_R_2)
        with Locations((91.44, -35.56)):
            Circle(SKETCH11_R_3)
    extrude(amount=-CUT_EXTRUDE11_DEPTH, mode=Mode.SUBTRACT)

    # Sketch12 → Cut-Extrude12 (cut)
    with BuildSketch(Plane.XY.offset(3.81).offset(CUT_EXTRUDE12_START)):
        with Locations((5.08, -5.08)):
            Circle(SKETCH12_R)
        with Locations((101.6, -5.08)):
            Circle(SKETCH12_R)
        with Locations((101.6, -85.09)):
            Circle(SKETCH12_R)
        with Locations((101.6, -165.1)):
            Circle(SKETCH12_R)
        with Locations((5.08, -165.1)):
            Circle(SKETCH12_R)
        with Locations((5.08, -85.09)):
            Circle(SKETCH12_R)
    extrude(amount=CUT_EXTRUDE12_DEPTH, mode=Mode.SUBTRACT)

    # Fillet1
    fillet1_edges = [part.edges().sort_by_distance(p)[0] for p in [
        (0, -102.108, 3.81),
        (5.08, -28.956, 3.81),
        (2.54, -36.576, 3.81),
        (2.54, -21.336, 3.81),
        (53.34, 0, 3.81),
        (0.743948776, -0.743948776, 3.81),
        (0, -11.938, 3.81),
        (0.743948776, -169.436051224, 3.81),
        (53.34, -170.18, 3.81),
        (105.936051224, -169.436051224, 3.81),
        (106.68, -85.09, 3.81),
        (105.936051224, -0.743948776, 3.81),
    ]]
    fillet(fillet1_edges, radius=FILLET1_R - 0.0001)  # a hair under: the kernel refuses the full size


solid = part.part
